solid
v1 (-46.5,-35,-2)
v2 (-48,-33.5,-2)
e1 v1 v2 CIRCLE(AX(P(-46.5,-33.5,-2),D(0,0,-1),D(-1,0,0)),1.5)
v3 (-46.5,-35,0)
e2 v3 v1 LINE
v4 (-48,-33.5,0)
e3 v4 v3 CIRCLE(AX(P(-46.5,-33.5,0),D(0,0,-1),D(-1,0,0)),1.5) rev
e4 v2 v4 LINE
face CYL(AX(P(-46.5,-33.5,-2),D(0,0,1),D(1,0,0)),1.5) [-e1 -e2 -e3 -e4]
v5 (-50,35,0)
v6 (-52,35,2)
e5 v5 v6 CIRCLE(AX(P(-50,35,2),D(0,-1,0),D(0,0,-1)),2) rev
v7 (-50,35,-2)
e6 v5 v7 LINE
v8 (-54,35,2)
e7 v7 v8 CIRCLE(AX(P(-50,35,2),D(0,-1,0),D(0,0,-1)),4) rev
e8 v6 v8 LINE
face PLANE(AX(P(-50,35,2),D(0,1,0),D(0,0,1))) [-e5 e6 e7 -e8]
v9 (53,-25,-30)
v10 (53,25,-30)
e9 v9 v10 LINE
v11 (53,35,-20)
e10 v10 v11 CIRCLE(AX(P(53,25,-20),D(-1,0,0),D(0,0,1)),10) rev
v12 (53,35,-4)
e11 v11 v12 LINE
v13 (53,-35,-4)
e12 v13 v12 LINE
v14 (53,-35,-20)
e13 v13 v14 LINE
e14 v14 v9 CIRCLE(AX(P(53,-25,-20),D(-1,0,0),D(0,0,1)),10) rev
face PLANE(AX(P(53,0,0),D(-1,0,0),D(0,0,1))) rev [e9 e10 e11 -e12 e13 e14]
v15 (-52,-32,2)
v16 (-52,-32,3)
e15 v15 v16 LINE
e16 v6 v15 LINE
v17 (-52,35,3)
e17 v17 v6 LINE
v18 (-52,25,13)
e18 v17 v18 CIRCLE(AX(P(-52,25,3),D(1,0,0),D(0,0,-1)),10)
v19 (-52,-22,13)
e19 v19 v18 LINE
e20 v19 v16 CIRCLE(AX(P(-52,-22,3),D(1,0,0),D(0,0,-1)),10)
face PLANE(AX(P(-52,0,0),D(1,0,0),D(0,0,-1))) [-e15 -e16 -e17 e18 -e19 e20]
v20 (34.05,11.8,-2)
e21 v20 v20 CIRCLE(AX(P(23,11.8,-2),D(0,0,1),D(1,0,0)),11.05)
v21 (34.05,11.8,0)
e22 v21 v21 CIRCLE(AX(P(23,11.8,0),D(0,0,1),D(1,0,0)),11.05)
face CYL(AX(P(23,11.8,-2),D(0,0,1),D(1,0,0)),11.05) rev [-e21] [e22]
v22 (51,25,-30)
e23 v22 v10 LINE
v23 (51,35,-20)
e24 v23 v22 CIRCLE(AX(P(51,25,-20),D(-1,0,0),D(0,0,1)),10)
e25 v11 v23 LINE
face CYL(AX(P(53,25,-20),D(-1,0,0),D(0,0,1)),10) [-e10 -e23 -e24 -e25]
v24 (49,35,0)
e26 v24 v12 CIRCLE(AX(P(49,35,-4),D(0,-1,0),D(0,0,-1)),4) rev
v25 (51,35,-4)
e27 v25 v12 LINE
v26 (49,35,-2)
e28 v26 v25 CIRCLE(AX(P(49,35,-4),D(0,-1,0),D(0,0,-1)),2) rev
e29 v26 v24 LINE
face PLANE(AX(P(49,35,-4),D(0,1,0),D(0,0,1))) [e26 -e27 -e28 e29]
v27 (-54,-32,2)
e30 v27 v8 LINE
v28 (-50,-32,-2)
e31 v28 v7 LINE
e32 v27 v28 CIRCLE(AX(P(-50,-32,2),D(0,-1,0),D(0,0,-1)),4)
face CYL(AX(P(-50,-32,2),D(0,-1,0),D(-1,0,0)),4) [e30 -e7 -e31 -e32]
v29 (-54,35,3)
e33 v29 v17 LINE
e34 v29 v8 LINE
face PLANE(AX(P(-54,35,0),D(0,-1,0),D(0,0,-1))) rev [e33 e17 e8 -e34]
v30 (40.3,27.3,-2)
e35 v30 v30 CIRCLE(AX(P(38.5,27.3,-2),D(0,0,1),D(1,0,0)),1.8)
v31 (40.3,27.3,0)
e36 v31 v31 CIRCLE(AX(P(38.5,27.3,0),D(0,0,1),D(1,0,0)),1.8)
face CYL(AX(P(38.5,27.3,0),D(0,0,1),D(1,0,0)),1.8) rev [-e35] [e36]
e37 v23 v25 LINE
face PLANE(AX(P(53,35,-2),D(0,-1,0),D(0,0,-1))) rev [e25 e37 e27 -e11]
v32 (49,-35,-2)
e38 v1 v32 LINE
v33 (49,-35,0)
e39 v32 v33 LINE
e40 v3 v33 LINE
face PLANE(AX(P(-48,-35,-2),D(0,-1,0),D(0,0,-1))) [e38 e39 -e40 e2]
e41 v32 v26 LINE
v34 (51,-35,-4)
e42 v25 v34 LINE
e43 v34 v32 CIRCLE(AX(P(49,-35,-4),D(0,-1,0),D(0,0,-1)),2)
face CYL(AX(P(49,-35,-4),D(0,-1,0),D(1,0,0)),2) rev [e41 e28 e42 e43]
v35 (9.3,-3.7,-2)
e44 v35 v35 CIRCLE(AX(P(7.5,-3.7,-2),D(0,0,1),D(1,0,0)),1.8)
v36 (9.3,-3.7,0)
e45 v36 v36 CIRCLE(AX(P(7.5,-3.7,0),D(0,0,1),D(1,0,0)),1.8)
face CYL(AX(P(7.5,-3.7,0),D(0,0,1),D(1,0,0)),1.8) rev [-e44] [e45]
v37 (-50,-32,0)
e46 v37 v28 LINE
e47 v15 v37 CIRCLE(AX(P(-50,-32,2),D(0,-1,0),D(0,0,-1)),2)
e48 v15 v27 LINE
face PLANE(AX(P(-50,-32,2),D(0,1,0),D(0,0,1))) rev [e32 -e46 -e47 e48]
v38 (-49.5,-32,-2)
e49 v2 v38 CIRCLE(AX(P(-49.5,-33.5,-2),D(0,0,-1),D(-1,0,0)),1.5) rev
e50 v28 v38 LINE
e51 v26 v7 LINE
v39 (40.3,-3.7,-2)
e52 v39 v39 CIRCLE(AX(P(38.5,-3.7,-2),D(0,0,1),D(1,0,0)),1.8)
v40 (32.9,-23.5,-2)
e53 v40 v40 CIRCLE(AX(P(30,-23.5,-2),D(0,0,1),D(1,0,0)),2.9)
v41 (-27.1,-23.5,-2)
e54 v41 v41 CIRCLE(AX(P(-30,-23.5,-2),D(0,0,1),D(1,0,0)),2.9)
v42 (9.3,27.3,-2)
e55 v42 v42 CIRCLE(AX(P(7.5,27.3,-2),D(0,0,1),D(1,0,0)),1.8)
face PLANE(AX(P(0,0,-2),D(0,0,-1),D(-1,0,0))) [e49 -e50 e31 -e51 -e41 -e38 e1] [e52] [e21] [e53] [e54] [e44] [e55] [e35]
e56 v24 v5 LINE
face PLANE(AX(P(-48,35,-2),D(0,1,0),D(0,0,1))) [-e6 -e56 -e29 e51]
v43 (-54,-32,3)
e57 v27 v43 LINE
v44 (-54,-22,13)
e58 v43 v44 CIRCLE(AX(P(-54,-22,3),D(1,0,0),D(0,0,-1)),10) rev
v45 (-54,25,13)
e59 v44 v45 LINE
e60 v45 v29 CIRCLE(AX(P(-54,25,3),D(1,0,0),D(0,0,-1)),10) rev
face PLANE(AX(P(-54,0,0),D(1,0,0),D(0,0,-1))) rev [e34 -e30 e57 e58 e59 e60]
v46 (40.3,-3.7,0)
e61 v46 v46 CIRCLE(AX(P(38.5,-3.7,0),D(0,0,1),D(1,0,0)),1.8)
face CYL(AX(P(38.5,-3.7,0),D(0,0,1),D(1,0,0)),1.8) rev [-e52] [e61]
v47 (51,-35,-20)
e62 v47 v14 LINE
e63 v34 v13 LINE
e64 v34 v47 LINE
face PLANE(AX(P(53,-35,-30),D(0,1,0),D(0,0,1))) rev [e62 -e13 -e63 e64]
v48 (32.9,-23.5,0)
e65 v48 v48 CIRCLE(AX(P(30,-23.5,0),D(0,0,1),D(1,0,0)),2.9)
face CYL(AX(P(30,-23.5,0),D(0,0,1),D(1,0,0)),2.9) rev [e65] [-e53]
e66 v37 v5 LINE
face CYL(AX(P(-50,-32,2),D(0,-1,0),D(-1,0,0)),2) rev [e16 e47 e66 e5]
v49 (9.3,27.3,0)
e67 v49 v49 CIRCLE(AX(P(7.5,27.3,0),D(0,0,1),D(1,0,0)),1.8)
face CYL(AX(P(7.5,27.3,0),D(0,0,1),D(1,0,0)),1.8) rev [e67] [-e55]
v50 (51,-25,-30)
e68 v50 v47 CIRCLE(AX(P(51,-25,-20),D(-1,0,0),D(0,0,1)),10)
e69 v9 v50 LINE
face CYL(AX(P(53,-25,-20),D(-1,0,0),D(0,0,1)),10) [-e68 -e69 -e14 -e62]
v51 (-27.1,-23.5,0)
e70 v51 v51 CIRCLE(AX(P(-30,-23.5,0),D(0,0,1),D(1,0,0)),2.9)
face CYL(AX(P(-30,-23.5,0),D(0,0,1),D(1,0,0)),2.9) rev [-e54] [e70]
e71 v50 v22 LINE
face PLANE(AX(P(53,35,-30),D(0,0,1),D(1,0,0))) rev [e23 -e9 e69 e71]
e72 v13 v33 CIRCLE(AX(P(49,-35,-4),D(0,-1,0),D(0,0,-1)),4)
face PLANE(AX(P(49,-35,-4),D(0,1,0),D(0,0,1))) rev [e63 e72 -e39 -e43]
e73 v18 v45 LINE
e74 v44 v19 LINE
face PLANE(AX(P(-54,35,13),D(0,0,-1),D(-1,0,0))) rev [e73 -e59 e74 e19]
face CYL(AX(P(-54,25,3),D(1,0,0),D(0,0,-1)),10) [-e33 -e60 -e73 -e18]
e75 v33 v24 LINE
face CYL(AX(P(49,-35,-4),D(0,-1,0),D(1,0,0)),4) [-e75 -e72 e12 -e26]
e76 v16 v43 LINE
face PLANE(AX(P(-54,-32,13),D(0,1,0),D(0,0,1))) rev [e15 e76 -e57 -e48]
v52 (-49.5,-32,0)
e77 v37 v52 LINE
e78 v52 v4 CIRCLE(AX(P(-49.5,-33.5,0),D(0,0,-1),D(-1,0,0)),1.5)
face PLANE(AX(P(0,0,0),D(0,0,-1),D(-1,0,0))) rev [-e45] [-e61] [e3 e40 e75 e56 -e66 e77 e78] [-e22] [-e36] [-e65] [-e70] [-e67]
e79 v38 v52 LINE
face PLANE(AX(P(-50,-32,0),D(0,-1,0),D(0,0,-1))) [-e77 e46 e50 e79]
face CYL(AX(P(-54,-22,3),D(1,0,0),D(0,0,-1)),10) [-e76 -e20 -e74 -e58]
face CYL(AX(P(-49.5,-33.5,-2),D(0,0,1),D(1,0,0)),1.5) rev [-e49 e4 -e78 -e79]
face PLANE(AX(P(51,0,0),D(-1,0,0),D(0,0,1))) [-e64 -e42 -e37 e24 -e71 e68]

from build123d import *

# Parameters (mm, degrees)
SKETCH1_W            = 96
SKETCH1_H            = 70
BASE_FLANGE1_DEPTH   = 2
SKETCH6_R            = 11.05
CUT_EXTRUDE1_DEPTH   = 2
M3_CLEARANCE_HOLE1_D = 3.6
EDGE_FLANGE1_DEPTH   = 67
M5_CLEARANCE_HOLE1_D = 5.8
EDGE_FLANGE2_DEPTH   = 70
FILLET1_R            = 10
FILLET2_R            = 1.5


# Sheet-metal steps are written as plain solids
with BuildPart() as part:
    # Sketch1 → Base-Flange1 (new body)
    with BuildSketch(Plane.XY):
        Rectangle(SKETCH1_W, SKETCH1_H)
    extrude(amount=-BASE_FLANGE1_DEPTH)

    # Sketch6 → Cut-Extrude1 (cut)
    with BuildSketch(Plane.XY):
        with Locations((23, 11.8)):
            Circle(SKETCH6_R)
    extrude(amount=-CUT_EXTRUDE1_DEPTH, mode=Mode.SUBTRACT)

    # M3 Clearance Hole1 (through all)
    with Locations(Plane.XY):
        with Locations((38.5, 27.3), (38.5, -3.7), (7.5, 27.3), (7.5, -3.7)):
            Hole(M3_CLEARANCE_HOLE1_D / 2)

    # Edge-Flange1 section (across the edge) → Edge-Flange1 (add)
    with BuildSketch(Plane(origin=(-52, 35, 0), x_dir=(1, 0, 0), z_dir=(0, -1, 0))):
        with BuildLine():
            Line((-2, 2), (-2, 13))
            Line((-2, 13), (0, 13))
            Line((0, 13), (0, 2))
            ThreePointArc((0, 2), (0.585786438, 0.585786438), (2, 0))
            Line((2, 0), (4, 0))
            Line((4, 0), (4, -2))
            Line((4, -2), (2, -2))
            ThreePointArc((2, -2), (-0.828427125, -0.828427125), (-2, 2))
        make_face()
    extrude(amount=EDGE_FLANGE1_DEPTH)

    # M5 Clearance Hole1 (through all)
    with Locations(Plane.XY):
        with Locations((30, -23.5), (-30, -23.5)):
            Hole(M5_CLEARANCE_HOLE1_D / 2)

    # Edge-Flange2 section (across the edge) → Edge-Flange2 (add)
    with BuildSketch(Plane(origin=(51, 35, -2), x_dir=(-1, 0, 0), z_dir=(0, -1, 0))):
        with BuildLine():
            Line((-2, 2), (-2, 28))
            Line((-2, 28), (0, 28))
            Line((0, 28), (0, 2))
            ThreePointArc((0, 2), (0.585786438, 0.585786438), (2, 0))
            Line((2, 0), (3, 0))
            Line((3, 0), (3, -2))
            Line((3, -2), (2, -2))
            ThreePointArc((2, -2), (-0.828427125, -0.828427125), (-2, 2))
        make_face()
    extrude(amount=EDGE_FLANGE2_DEPTH)

    # Fillet1
    fillet1_edges = [part.edges().sort_by_distance(p)[0] for p in [
        (52, 35, -30),
        (52, -35, -30),
        (-53, 35, 13),
        (-53, -32, 13),
    ]]
    fillet(fillet1_edges, radius=FILLET1_R)

    # Fillet2
    fillet2_edges = [part.edges().sort_by_distance(p)[0] for p in [
        (-48, -32, -1),
    ]]
    fillet(fillet2_edges, radius=FILLET2_R)
    fillet2_2_edges = [part.edges().sort_by_distance(p)[0] for p in [
        (-48, -35, -1),
    ]]
    fillet(fillet2_2_edges, radius=FILLET2_R - 0.0001)  # a hair under: the kernel refuses the full size


solid = part.part
